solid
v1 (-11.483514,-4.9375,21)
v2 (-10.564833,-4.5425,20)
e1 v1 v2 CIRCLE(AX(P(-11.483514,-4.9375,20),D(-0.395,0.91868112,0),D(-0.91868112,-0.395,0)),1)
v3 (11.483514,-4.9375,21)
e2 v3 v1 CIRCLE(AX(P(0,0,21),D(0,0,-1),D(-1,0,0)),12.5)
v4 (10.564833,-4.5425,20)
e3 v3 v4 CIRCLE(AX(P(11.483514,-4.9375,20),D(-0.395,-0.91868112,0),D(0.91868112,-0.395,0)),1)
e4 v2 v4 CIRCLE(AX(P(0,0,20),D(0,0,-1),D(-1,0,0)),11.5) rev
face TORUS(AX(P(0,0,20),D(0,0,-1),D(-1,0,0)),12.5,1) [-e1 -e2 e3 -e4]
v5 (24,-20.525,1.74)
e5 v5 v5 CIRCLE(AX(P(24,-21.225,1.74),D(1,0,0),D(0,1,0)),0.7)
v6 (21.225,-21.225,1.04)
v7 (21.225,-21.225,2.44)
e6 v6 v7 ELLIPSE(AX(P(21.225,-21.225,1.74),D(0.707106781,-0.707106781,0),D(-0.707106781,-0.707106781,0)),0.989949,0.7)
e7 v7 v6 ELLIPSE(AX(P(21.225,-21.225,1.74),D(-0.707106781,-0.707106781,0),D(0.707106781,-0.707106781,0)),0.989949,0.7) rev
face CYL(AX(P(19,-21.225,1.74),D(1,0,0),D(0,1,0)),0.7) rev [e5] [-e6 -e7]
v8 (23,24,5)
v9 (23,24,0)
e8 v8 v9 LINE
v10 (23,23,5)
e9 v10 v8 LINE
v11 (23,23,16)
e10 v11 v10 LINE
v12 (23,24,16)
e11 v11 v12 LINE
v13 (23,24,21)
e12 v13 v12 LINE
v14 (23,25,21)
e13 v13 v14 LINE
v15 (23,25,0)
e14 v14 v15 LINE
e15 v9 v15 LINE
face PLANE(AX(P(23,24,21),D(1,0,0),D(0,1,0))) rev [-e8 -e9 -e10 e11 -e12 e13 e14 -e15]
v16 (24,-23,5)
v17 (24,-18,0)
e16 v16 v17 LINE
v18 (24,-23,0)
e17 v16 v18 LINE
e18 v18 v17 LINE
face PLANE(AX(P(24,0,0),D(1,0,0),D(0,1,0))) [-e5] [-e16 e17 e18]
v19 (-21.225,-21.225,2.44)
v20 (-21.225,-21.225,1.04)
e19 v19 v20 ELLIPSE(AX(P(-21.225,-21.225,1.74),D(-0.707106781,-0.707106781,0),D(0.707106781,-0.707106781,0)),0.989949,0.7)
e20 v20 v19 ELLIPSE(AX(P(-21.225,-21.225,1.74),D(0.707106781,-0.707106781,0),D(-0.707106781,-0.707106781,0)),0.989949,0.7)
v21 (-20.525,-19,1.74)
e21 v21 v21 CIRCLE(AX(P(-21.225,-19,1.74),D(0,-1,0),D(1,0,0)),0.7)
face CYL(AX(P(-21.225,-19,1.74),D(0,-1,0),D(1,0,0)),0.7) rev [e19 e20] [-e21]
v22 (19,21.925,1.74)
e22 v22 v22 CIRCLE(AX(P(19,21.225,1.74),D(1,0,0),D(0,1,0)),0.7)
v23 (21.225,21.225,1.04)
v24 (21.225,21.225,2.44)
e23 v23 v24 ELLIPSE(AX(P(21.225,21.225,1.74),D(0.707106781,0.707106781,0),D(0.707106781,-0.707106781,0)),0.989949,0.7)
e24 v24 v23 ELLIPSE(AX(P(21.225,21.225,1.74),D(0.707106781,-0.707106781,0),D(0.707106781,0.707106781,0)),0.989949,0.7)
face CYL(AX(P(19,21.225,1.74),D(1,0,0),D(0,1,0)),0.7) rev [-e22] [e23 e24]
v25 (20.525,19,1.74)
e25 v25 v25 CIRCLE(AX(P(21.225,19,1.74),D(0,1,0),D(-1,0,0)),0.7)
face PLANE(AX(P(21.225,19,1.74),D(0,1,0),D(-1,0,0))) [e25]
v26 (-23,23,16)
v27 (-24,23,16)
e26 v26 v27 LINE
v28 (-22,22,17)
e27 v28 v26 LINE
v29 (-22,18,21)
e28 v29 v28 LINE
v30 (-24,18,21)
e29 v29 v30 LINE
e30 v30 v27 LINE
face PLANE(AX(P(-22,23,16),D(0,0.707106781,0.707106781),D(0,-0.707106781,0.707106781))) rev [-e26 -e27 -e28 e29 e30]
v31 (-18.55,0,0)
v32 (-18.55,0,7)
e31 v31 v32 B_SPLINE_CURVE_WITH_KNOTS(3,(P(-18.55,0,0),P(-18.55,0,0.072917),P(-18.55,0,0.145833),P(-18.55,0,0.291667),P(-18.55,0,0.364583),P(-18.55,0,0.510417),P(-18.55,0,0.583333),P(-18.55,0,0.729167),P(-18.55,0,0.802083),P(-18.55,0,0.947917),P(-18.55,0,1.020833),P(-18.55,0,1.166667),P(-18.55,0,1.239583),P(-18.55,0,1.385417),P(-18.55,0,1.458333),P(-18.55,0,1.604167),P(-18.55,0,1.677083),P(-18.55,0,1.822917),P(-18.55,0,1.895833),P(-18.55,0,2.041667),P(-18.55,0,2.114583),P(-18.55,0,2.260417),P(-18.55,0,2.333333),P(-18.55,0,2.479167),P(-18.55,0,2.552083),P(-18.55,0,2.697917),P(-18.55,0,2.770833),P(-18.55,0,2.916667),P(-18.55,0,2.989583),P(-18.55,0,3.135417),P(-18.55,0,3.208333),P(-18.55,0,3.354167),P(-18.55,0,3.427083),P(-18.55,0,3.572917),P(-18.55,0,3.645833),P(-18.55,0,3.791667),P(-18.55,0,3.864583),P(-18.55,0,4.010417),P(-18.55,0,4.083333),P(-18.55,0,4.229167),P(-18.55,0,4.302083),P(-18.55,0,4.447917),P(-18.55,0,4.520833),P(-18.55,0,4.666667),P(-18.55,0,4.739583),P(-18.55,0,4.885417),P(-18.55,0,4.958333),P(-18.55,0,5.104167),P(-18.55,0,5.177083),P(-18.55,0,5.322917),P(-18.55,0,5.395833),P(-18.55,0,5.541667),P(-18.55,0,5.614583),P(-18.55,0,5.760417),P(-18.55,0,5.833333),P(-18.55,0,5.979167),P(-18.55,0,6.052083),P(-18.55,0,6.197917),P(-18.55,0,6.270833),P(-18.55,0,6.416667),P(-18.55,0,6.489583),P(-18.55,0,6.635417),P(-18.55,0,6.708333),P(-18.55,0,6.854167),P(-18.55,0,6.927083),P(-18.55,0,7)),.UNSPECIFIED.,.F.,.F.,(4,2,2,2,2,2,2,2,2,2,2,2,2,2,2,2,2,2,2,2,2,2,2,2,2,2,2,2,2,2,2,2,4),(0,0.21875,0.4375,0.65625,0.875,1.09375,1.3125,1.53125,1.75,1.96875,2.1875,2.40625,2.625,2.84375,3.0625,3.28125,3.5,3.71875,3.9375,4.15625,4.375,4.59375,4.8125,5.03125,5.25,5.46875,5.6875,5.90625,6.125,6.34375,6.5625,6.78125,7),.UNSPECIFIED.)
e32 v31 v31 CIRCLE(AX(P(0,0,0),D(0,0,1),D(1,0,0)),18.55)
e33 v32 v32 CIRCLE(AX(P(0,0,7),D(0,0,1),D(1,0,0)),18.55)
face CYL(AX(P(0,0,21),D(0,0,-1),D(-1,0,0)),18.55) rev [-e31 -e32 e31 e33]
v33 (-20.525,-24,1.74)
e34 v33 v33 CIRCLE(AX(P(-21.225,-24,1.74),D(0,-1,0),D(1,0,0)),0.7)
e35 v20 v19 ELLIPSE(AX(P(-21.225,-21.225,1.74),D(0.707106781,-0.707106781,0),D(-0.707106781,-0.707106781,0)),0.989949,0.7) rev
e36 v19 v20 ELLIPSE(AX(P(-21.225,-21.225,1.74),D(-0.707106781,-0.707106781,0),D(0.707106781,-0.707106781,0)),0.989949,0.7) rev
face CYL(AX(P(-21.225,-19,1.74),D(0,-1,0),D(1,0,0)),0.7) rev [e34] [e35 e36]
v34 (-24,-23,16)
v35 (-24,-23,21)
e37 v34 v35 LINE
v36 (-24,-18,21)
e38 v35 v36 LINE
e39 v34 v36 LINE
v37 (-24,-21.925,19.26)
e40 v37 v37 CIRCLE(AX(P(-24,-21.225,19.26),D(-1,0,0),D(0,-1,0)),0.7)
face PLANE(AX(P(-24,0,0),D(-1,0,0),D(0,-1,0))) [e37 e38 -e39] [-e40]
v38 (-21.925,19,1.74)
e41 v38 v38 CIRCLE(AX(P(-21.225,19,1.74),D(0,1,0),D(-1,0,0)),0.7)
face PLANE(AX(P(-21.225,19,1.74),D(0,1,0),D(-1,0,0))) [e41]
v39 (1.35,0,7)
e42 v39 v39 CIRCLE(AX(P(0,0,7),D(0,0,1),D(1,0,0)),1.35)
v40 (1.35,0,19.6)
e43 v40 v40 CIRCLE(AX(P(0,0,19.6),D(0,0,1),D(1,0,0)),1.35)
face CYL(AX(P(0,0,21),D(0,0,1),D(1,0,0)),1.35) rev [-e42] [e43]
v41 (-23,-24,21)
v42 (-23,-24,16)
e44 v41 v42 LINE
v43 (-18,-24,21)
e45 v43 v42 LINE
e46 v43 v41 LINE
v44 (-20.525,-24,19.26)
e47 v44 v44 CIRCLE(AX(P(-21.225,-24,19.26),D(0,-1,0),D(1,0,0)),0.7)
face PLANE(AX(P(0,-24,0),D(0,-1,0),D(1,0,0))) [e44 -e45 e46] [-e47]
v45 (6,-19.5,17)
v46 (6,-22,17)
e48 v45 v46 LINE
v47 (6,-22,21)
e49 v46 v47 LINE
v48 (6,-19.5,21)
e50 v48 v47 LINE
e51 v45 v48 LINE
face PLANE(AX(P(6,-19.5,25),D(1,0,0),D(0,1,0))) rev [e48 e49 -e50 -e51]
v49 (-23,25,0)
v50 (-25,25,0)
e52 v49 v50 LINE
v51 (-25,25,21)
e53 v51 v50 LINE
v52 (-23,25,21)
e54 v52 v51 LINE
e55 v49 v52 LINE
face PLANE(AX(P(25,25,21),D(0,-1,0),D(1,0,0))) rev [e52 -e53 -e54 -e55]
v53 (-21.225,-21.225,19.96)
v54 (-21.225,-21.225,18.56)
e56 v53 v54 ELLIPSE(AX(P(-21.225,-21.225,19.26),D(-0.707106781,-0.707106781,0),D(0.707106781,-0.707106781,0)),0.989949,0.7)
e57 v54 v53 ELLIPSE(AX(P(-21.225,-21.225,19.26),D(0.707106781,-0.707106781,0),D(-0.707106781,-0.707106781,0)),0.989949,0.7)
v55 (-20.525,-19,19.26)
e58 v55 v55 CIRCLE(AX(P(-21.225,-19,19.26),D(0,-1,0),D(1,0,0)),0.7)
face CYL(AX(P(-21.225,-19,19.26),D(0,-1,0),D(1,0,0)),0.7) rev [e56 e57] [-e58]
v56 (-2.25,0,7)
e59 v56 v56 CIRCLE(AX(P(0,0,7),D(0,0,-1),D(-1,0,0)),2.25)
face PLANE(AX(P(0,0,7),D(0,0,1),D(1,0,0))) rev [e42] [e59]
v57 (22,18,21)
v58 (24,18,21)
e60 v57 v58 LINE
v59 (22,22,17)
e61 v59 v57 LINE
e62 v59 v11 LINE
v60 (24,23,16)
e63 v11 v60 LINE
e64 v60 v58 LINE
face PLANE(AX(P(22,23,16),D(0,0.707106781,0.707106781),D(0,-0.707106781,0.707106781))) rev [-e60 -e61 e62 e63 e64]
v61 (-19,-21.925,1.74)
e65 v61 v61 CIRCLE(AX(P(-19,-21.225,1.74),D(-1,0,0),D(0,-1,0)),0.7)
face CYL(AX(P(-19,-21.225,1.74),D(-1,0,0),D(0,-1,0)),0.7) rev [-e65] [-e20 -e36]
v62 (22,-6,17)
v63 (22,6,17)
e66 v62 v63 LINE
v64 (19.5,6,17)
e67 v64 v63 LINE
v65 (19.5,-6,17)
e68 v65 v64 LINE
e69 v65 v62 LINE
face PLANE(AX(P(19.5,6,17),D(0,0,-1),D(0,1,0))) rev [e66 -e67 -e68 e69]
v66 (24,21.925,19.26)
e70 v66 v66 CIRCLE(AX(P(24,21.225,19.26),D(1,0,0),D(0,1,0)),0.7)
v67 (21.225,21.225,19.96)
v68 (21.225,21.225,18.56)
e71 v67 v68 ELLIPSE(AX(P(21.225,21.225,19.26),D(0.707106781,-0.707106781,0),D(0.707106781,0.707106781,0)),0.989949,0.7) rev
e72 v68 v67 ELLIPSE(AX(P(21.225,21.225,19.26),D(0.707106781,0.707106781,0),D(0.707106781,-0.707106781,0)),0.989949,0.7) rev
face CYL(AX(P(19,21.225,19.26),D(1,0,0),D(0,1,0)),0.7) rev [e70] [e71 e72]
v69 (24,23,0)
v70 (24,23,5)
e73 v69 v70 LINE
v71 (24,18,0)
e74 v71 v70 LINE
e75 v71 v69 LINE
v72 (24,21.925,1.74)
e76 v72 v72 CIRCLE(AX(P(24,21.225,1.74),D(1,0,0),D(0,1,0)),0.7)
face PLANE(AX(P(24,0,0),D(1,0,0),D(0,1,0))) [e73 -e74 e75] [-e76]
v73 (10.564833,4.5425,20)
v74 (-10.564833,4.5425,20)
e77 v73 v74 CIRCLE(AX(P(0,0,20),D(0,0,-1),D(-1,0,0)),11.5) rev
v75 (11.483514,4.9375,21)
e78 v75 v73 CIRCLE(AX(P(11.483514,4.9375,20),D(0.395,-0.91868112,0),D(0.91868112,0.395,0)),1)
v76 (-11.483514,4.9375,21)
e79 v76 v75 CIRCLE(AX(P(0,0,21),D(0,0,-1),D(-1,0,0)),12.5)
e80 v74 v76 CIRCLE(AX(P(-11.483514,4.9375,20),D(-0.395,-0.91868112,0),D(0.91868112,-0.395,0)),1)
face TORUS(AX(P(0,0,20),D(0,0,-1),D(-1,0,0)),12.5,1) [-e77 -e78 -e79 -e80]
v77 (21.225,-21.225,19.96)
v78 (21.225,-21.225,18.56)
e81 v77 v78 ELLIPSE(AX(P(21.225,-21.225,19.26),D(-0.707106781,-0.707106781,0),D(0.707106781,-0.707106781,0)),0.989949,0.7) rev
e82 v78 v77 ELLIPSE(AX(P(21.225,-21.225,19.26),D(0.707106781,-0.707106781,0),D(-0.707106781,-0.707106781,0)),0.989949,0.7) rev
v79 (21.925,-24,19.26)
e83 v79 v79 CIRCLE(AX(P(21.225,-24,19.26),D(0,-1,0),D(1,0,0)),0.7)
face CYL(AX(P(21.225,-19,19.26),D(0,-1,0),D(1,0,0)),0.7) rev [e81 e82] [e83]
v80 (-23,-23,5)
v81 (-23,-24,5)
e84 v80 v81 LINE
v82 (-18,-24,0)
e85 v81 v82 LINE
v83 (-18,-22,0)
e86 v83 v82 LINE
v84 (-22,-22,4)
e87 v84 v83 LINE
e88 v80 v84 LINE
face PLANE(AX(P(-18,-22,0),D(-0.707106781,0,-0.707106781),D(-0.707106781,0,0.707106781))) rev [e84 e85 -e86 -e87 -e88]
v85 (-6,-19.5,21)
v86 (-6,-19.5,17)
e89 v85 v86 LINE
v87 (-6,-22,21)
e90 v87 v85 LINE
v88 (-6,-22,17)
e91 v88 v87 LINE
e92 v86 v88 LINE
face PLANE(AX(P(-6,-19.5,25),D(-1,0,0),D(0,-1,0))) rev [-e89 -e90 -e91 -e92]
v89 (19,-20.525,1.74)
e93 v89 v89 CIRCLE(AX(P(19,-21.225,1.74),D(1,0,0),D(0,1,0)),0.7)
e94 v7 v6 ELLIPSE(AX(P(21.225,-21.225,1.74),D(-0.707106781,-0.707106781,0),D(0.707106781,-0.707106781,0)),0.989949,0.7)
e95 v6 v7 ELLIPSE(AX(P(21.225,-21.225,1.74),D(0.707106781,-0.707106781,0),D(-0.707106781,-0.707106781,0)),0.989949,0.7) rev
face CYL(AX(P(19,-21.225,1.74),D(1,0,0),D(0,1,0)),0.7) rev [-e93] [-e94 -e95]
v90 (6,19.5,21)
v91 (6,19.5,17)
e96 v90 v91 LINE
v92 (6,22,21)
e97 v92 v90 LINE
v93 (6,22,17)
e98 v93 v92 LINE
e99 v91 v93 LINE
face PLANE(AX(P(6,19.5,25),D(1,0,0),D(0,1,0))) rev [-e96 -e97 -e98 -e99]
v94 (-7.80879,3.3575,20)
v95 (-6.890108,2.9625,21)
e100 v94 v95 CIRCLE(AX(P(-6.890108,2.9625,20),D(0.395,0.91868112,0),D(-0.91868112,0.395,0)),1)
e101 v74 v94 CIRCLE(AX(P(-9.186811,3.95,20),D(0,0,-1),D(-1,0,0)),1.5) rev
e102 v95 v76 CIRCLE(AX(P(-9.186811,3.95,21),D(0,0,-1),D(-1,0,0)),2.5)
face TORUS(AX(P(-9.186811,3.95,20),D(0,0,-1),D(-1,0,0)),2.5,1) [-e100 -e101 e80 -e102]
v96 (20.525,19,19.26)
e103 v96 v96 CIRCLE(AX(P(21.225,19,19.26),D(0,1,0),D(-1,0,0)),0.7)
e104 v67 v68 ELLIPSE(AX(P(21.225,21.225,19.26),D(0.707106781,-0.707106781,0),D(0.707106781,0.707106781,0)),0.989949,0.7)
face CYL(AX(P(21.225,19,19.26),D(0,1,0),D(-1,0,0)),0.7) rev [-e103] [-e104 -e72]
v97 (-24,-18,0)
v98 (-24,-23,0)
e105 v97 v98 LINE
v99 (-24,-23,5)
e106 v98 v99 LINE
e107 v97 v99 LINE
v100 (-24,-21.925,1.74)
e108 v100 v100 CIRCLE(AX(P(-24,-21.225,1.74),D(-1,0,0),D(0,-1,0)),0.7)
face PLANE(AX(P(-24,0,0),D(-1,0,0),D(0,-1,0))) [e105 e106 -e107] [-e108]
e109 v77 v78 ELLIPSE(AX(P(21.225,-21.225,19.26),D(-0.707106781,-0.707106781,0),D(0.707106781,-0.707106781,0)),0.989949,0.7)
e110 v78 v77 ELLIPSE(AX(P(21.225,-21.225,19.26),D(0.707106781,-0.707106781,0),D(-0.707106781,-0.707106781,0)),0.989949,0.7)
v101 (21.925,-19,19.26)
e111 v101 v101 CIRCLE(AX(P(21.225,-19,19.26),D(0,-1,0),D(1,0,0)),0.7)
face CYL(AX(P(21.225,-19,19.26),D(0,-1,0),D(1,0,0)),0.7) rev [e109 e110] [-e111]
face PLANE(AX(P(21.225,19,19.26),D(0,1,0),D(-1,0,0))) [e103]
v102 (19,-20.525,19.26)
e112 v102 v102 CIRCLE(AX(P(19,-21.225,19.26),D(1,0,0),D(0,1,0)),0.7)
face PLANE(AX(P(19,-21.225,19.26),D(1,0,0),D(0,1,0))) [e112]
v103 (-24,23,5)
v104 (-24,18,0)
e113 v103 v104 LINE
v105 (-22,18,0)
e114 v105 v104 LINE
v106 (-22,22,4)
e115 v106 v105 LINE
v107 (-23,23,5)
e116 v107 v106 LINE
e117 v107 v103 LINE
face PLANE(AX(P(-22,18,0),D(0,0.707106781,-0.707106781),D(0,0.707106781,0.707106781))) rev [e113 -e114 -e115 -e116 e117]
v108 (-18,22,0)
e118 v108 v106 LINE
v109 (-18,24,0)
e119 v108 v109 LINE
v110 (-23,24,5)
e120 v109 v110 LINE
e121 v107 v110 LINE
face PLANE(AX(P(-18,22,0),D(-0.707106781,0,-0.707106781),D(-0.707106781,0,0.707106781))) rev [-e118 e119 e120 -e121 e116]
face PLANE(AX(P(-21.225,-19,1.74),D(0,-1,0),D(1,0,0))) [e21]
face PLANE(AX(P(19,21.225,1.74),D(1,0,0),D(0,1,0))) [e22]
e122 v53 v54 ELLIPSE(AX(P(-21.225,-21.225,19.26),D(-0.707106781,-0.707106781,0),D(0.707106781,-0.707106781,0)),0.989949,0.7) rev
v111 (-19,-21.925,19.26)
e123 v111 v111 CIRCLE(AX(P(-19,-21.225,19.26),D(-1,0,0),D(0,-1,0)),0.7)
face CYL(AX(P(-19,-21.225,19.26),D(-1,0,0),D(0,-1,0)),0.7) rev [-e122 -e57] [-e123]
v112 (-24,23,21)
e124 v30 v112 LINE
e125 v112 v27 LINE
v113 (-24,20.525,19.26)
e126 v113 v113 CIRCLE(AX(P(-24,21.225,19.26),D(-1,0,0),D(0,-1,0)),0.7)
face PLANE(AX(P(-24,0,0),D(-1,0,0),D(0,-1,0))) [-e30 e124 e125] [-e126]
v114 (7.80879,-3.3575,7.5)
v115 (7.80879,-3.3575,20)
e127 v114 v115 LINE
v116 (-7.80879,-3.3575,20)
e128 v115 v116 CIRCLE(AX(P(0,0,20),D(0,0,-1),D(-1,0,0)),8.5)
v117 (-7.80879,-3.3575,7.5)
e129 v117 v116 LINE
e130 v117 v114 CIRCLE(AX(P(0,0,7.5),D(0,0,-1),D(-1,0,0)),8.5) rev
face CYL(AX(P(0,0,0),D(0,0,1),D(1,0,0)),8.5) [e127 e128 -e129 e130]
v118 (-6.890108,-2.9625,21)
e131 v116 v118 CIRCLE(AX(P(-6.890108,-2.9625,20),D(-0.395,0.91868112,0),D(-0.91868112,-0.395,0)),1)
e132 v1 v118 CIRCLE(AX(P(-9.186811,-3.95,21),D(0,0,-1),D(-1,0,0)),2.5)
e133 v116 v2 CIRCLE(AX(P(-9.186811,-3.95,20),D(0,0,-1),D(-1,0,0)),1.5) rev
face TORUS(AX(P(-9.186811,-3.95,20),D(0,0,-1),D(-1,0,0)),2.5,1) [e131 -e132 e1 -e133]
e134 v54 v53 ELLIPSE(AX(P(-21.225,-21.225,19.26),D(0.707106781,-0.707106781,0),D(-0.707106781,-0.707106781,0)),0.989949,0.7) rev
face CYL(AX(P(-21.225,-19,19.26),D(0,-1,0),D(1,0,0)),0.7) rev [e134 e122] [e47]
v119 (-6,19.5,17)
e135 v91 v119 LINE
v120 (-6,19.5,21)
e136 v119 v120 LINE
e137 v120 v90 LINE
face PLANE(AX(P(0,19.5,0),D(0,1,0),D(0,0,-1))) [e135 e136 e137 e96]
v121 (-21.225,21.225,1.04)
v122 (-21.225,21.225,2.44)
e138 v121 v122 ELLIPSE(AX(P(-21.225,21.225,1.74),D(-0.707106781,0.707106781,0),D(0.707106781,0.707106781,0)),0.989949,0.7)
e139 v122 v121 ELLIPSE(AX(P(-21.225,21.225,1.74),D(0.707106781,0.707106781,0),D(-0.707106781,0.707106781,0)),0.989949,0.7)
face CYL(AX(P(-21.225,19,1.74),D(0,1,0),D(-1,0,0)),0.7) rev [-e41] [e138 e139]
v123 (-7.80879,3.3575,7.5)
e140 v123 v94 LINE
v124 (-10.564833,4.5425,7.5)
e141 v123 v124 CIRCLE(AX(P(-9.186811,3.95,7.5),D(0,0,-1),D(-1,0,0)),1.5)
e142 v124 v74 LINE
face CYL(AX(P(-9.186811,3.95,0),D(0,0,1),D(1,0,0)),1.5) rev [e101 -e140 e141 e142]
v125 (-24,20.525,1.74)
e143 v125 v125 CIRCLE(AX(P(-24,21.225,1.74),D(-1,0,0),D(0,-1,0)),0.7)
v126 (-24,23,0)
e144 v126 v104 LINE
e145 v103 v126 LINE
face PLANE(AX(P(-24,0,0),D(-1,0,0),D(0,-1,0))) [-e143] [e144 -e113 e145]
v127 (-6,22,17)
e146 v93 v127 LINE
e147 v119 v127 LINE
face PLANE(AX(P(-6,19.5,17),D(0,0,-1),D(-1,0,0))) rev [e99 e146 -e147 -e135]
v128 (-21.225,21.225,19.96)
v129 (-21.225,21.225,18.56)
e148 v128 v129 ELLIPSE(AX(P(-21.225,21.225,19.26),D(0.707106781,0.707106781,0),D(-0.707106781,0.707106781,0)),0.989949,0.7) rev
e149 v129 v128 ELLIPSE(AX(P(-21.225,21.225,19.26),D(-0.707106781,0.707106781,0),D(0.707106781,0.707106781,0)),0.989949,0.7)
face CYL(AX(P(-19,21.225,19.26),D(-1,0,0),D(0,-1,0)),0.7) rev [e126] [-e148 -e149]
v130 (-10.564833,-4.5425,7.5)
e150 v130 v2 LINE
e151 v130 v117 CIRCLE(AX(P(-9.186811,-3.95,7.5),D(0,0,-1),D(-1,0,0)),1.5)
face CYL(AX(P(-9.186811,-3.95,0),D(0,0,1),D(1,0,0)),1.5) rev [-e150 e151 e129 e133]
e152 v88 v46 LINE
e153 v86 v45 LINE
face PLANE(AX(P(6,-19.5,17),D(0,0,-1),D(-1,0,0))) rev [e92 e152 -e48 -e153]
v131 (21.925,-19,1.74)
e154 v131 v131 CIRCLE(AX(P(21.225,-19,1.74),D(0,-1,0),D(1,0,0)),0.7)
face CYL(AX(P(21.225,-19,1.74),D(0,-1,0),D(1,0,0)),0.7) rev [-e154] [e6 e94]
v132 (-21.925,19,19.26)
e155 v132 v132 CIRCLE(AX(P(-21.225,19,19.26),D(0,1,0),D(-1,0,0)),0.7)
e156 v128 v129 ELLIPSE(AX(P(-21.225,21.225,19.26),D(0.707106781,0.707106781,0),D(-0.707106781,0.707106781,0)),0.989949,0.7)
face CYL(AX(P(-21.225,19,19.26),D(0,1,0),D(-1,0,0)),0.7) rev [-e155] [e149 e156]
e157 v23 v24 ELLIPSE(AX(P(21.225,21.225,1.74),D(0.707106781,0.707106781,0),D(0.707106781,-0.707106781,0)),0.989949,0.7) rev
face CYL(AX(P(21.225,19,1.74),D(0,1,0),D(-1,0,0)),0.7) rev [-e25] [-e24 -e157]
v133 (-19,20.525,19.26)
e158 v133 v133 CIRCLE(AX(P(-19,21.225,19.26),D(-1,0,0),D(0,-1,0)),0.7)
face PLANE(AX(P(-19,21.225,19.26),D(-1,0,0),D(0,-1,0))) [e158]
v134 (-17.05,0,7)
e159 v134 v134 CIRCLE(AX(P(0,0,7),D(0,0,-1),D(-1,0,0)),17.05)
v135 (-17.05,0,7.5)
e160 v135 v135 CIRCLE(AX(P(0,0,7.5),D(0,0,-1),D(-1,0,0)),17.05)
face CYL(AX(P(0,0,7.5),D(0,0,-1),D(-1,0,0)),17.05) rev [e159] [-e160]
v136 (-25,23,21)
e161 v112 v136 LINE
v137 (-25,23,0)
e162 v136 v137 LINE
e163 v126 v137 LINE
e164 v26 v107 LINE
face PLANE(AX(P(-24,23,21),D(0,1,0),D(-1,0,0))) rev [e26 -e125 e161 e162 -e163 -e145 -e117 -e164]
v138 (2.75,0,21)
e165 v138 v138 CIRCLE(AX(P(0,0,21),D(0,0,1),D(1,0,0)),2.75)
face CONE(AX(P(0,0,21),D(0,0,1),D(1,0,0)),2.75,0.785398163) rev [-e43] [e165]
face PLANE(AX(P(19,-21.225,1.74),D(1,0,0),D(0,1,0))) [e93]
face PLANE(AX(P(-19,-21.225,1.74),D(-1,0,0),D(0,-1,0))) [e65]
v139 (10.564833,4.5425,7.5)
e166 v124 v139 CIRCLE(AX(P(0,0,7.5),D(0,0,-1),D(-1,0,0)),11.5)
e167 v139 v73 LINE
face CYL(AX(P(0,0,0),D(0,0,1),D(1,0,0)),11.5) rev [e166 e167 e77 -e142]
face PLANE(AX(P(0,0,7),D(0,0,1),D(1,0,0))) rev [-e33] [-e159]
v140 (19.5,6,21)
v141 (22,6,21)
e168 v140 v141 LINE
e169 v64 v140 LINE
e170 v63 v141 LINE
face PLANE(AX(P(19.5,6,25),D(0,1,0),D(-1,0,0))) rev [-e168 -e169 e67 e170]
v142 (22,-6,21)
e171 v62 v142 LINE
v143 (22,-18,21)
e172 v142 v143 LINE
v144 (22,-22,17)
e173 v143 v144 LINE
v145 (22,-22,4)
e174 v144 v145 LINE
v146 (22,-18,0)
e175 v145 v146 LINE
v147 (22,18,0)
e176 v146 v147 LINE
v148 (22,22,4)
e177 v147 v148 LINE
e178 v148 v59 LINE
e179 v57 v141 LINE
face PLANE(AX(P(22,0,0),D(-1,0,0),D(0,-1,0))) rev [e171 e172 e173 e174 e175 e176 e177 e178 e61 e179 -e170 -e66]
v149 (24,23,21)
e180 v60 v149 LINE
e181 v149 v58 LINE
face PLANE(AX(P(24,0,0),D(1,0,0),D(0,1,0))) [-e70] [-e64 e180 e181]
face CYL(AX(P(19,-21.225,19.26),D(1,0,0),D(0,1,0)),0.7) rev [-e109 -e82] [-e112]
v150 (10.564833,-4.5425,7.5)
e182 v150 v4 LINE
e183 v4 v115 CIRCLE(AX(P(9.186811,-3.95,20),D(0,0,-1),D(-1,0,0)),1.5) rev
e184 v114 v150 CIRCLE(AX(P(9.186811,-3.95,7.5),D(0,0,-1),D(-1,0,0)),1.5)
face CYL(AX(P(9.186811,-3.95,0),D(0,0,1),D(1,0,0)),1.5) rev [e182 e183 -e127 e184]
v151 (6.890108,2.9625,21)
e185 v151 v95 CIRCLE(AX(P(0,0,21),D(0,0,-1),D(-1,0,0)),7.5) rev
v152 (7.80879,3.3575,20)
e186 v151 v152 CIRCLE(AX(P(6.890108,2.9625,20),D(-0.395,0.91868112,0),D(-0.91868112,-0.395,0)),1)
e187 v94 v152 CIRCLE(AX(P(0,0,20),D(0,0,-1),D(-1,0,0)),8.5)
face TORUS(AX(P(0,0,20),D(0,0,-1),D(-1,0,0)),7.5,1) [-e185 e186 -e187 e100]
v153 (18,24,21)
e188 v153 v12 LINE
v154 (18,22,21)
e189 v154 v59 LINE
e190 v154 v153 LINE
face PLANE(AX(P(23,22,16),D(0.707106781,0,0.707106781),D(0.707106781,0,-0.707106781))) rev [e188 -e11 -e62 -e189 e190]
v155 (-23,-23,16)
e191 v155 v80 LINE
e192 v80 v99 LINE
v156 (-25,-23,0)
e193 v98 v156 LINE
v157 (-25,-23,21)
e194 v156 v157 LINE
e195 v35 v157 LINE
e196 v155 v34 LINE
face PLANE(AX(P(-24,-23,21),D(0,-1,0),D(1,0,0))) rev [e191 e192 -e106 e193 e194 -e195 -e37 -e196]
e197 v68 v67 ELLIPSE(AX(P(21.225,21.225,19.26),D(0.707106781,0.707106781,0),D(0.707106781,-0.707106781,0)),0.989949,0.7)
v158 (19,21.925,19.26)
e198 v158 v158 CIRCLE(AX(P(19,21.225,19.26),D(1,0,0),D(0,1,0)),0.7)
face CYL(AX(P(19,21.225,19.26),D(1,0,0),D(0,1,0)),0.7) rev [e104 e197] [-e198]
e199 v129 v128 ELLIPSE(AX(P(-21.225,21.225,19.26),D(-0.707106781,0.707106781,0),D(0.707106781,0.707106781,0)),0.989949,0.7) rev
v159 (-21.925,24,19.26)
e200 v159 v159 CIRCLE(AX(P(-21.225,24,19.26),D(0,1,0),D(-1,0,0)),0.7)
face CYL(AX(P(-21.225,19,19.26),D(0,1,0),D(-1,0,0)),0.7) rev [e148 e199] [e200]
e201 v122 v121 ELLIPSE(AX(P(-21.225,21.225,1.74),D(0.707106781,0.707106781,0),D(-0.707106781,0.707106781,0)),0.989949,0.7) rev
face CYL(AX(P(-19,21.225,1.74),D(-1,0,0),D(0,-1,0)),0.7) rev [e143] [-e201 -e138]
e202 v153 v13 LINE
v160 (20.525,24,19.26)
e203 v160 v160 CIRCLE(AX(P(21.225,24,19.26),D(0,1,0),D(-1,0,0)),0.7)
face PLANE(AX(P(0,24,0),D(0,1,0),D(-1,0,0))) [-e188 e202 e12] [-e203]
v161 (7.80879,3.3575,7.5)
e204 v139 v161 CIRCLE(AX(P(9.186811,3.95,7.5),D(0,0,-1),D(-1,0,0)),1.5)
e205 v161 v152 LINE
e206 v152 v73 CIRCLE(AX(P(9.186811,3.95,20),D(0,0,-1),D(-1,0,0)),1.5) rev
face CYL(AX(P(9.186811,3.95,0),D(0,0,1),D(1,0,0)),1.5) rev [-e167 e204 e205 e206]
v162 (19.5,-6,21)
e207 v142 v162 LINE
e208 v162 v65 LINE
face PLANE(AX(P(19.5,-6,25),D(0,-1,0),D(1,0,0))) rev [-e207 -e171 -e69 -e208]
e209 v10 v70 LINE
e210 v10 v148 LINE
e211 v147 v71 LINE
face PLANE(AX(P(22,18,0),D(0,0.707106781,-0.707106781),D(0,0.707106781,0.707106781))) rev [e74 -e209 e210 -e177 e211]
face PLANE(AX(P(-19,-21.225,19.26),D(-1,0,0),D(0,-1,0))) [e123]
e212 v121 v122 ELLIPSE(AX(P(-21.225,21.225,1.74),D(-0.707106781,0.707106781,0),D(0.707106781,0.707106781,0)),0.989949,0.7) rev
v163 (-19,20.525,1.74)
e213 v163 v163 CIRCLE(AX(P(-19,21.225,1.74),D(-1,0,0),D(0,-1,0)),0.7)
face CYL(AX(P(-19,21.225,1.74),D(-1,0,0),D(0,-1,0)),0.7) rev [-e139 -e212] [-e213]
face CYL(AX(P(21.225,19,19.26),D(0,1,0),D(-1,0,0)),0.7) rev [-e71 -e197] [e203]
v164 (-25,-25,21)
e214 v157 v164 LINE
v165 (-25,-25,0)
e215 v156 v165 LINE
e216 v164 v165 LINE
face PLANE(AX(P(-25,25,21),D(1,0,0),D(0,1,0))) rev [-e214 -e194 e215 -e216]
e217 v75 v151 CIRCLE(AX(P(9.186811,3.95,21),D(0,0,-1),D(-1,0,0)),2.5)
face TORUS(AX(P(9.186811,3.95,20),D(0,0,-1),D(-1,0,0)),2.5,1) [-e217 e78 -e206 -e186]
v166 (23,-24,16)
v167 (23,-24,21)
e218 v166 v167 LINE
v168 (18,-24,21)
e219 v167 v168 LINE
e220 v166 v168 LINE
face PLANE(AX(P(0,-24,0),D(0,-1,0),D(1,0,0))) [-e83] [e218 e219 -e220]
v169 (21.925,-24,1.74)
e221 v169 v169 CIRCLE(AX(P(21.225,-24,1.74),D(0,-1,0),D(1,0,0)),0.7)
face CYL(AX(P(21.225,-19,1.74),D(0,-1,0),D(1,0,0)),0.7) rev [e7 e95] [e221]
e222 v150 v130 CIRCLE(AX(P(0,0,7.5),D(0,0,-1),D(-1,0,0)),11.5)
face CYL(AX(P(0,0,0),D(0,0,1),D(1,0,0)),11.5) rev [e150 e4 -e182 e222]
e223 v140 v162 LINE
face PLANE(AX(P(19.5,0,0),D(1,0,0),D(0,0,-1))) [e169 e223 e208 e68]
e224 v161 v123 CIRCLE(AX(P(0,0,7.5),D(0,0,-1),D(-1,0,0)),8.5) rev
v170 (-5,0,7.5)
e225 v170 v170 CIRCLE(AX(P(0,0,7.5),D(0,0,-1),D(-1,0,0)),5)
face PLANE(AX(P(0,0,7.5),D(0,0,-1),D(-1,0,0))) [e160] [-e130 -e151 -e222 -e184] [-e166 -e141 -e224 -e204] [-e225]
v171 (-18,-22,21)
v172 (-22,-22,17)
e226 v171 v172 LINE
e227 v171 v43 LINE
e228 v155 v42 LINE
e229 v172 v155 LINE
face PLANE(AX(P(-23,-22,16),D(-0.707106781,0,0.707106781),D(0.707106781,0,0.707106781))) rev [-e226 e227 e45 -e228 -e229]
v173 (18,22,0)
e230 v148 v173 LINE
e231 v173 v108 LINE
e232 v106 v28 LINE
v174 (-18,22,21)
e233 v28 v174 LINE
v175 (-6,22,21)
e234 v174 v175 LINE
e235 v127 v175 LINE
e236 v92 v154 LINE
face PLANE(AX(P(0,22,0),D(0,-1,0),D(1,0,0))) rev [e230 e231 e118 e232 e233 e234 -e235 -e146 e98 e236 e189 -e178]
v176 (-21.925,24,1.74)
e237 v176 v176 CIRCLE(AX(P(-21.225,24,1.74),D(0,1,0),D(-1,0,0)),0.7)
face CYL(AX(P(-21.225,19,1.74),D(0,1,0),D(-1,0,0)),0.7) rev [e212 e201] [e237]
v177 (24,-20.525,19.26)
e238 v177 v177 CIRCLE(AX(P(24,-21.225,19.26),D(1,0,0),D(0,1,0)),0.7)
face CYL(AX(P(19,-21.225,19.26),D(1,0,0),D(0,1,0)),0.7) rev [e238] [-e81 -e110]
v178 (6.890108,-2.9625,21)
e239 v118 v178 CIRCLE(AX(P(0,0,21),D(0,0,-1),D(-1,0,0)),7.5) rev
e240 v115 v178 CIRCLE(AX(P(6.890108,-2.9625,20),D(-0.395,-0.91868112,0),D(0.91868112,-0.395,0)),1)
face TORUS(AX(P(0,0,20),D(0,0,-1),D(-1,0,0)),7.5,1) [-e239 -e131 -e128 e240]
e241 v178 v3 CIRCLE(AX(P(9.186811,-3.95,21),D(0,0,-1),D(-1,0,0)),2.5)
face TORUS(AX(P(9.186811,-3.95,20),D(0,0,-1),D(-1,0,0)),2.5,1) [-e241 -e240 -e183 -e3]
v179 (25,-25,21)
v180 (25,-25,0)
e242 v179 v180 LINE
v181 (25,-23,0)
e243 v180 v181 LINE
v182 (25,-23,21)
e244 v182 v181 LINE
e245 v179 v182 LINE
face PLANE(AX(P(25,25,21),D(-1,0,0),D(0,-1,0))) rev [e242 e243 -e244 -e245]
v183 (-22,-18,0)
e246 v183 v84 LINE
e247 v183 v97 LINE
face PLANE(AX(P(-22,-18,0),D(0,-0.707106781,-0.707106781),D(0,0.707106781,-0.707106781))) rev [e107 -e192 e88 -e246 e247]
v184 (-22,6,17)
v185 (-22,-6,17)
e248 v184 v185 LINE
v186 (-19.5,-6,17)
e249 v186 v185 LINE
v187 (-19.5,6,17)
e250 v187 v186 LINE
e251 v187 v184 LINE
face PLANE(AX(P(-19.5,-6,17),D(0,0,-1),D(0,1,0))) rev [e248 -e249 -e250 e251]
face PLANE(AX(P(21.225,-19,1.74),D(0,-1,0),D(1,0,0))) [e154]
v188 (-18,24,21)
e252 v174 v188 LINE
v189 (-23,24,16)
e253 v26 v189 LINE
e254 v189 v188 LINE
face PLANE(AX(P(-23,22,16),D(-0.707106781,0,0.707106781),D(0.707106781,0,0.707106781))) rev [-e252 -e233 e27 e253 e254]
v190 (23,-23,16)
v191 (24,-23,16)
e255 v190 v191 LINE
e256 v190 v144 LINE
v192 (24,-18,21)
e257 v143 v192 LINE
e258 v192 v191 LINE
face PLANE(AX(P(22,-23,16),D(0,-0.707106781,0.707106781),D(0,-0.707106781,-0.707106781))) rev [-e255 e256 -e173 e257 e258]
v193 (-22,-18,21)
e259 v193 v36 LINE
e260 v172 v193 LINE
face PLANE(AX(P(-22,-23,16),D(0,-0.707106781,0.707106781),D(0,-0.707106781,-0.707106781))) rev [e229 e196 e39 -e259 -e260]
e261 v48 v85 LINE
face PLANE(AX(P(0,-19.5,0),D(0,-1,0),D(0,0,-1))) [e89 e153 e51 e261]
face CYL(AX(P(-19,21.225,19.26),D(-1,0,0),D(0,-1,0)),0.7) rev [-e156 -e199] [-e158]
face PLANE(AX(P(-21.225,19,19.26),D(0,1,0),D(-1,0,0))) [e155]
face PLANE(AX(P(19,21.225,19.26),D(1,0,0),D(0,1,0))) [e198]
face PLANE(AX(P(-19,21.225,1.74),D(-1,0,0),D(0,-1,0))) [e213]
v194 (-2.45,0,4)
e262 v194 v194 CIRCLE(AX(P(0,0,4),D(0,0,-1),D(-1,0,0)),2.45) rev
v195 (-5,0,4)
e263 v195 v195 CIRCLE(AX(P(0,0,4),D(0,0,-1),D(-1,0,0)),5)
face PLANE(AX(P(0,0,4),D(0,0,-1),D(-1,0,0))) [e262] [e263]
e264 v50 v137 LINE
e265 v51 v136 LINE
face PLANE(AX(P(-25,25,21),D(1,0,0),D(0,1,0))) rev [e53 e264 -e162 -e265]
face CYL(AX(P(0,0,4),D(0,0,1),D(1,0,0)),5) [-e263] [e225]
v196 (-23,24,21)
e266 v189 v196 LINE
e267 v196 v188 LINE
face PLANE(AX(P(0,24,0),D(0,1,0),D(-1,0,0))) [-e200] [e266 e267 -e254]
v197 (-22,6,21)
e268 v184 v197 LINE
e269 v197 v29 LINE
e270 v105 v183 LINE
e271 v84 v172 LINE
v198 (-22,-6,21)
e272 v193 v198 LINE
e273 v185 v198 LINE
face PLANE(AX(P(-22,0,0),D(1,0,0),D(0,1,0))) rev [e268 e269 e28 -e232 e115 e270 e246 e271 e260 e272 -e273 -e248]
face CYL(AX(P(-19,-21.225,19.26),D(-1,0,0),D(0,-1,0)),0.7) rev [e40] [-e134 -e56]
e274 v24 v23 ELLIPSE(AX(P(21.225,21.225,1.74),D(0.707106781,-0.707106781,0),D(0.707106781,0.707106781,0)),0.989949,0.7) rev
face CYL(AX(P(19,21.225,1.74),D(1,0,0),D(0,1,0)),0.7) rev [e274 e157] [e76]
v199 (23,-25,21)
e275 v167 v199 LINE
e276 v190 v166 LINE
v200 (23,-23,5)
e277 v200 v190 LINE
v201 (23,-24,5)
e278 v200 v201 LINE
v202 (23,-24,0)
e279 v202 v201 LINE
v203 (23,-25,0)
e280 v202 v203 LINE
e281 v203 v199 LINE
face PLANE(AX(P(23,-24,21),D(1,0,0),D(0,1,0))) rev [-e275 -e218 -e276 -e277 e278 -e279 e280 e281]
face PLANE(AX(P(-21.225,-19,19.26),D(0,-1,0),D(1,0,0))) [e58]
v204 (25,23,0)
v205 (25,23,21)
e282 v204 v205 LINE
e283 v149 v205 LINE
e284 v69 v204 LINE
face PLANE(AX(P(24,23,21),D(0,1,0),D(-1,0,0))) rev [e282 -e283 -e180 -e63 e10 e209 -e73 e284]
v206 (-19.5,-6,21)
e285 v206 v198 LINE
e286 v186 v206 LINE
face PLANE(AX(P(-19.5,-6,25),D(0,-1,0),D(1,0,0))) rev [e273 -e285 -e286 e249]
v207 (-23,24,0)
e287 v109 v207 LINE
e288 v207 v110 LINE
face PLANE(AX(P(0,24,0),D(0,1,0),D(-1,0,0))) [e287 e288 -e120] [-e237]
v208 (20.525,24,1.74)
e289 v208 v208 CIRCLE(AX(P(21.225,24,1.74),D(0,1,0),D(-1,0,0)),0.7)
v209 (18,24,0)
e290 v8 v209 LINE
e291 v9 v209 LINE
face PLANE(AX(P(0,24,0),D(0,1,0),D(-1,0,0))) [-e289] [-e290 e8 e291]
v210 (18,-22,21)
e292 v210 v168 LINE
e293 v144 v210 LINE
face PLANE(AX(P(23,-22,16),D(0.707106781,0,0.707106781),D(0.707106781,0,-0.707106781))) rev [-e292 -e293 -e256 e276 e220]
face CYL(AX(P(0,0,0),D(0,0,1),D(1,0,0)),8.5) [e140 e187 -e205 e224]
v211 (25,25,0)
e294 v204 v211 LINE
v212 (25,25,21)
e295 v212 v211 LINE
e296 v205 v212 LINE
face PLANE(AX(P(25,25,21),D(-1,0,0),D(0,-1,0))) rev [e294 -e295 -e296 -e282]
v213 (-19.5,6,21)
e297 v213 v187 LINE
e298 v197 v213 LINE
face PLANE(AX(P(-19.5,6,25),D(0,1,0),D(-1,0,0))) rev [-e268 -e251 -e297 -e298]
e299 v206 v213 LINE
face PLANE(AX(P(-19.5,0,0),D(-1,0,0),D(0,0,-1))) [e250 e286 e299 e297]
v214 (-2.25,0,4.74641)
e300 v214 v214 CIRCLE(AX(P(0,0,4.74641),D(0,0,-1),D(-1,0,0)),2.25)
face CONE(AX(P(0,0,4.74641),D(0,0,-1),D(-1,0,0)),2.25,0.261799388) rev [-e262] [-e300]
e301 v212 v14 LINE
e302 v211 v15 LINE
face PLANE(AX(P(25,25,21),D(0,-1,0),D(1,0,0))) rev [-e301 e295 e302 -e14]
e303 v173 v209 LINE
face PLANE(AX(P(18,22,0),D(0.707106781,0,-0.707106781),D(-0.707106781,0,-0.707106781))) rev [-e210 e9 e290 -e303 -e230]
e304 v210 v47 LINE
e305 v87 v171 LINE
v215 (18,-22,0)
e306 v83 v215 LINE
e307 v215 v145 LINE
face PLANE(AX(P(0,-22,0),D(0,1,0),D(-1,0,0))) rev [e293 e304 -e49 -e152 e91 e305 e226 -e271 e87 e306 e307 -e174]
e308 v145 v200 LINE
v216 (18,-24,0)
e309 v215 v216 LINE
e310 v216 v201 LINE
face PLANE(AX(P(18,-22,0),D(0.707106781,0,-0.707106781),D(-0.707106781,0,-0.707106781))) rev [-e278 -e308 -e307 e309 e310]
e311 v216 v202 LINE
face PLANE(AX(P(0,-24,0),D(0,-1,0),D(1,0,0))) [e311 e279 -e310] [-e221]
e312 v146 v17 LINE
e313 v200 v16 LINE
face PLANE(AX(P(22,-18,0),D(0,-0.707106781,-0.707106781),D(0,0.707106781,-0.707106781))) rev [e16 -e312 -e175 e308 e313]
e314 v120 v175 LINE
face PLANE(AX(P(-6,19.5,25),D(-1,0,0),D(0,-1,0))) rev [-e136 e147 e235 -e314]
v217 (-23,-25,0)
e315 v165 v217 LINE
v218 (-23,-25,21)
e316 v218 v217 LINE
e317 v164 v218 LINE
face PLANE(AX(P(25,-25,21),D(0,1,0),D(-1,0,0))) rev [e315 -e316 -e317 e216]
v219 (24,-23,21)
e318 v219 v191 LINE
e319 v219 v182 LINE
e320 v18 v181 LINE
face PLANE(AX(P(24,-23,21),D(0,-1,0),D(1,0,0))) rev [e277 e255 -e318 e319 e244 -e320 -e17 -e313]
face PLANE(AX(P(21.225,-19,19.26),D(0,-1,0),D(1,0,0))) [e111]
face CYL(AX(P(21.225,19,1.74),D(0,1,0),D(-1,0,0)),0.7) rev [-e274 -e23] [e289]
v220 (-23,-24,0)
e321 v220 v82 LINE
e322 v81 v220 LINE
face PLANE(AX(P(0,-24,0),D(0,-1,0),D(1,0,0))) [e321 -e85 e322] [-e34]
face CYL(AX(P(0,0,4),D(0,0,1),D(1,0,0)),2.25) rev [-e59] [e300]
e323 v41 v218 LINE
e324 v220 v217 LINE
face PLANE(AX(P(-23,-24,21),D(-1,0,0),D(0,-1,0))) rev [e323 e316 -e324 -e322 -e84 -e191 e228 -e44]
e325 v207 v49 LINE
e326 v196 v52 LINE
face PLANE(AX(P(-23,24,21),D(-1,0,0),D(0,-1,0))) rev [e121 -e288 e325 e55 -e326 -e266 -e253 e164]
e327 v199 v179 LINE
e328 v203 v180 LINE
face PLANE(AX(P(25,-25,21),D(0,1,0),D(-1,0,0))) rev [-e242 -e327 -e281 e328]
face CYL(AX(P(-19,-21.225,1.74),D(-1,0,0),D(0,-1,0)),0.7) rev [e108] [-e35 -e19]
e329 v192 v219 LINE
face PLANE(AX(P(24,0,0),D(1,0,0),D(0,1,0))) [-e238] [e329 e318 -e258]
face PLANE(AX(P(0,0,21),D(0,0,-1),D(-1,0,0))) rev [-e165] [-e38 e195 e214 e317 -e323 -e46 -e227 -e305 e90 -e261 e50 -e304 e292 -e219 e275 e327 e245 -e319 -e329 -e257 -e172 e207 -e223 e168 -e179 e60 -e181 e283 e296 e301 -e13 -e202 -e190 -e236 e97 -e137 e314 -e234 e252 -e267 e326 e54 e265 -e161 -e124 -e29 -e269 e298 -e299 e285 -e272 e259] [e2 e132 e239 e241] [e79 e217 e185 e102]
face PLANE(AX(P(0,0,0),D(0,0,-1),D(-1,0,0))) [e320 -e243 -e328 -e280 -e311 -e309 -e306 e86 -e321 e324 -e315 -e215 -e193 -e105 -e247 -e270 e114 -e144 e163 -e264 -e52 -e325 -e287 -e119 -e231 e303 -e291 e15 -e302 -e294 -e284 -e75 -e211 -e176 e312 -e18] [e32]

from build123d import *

# Parameters (mm, degrees)
SKIZZE1_W                                           = 50
SKIZZE1_H                                           = 50
SKIZZE1_R                                           = 18.55
AUFSATZ_LINEAR_AUSTRAGEN1_DEPTH                     = 21
SKIZZE2_W                                           = 50
SKIZZE2_H                                           = 50
AUFSATZ_LINEAR_AUSTRAGEN2_DEPTH                     = 3
FORMSENKUNG_F_R_M2_5_LINSENSENKSCHRAUBE_D           = 2.7
FORMSENKUNG_F_R_M2_5_LINSENSENKSCHRAUBE_CSINK_D     = 5.5
FORMSENKUNG_F_R_M2_5_LINSENSENKSCHRAUBE_CSINK_ANGLE = 90
SKIZZE5_W                                           = 21
SKIZZE5_H                                           = 46
SCHNITT_LINEAR_AUSTRAGEN1_DEPTH                     = 1
SCHNITT_LINEAR_AUSTRAGEN2_DEPTH                     = 2
SKIZZE7_W                                           = 8
SKIZZE7_H                                           = 12
SCHNITT_LINEAR_AUSTRAGEN3_DEPTH                     = 2.5
KREISMUSTER1_COUNT                                  = 4
SKIZZE8_R                                           = 5
SKIZZE8_R_2                                         = 2.25
AUFSATZ_LINEAR_AUSTRAGEN3_DEPTH                     = 3
FASE1_SIZE                                          = 0.2
FASE1_SIZE2                                         = 0.746410162
SKIZZE10_R                                          = 0.7
SCHNITT_LINEAR_AUSTRAGEN4_DEPTH                     = 5
KREISMUSTER2_COUNT                                  = 4
SCHNITT_LINEAR_START                                = -0.5
SKIZZE12_R                                          = 17.05
SKIZZE12_R_2                                        = 5
SCHNITT_LINEAR_AUSTRAGEN7_DEPTH                     = 0.5
SCHNITT_LINEAR_AUSTRAGEN8_DEPTH                     = 42.12177039
VERRUNDUNG1_R                                       = 1


# Read off the part's stored shape, not the designer's step: Fläche verschieben1
with BuildPart() as part:
    # Skizze1 → Aufsatz-Linear austragen1 (new body)
    with BuildSketch(Plane.XY):
        Rectangle(SKIZZE1_W, SKIZZE1_H)
        with Locations(Location((0, 0, 0), (0, 0, 180))):
            Circle(SKIZZE1_R, mode=Mode.SUBTRACT)
    extrude(amount=AUFSATZ_LINEAR_AUSTRAGEN1_DEPTH)

    # Skizze2 → Aufsatz-Linear austragen2 (add)
    with BuildSketch(Plane.XY.offset(21)):
        Rectangle(SKIZZE2_W, SKIZZE2_H)
    extrude(amount=-AUFSATZ_LINEAR_AUSTRAGEN2_DEPTH)

    # Formsenkung für M2.5 Linsensenkschraube mit Schlitz1 (through all)
    with Locations(Plane.XY.offset(21)):
        with Locations((0, 0)):
            CounterSinkHole(FORMSENKUNG_F_R_M2_5_LINSENSENKSCHRAUBE_D / 2, FORMSENKUNG_F_R_M2_5_LINSENSENKSCHRAUBE_CSINK_D / 2, counter_sink_angle=FORMSENKUNG_F_R_M2_5_LINSENSENKSCHRAUBE_CSINK_ANGLE)

    # Skizze5 → Schnitt-Linear austragen1 (cut)
    with BuildSketch(Plane(origin=(25, 0, 0), x_dir=(0, 0, -1), z_dir=(1, 0, 0))):
        with Locations((-10.5, 0)):
            Rectangle(SKIZZE5_W, SKIZZE5_H)
    schnitt_linear_austragen1 = extrude(amount=-SCHNITT_LINEAR_AUSTRAGEN1_DEPTH, mode=Mode.SUBTRACT)

    # Skizze6 → Schnitt-Linear austragen2 (cut)
    with BuildSketch(Plane(origin=(24, 0, 0), x_dir=(0, 0, -1), z_dir=(1, 0, 0))):
        Polygon((-16, 23), (-21, 18), (-21, -18), (-16, -23), (-5, -23), (0, -18), (0, 18), (-5, 23), align=None)
    schnitt_linear_austragen2 = extrude(amount=-SCHNITT_LINEAR_AUSTRAGEN2_DEPTH, mode=Mode.SUBTRACT)

    # Skizze7 → Schnitt-Linear austragen3 (cut)
    with BuildSketch(Plane(origin=(22, 0, 0), x_dir=(0, 0, -1), z_dir=(1, 0, 0))):
        with Locations((-21, 0)):
            Rectangle(SKIZZE7_W, SKIZZE7_H)
    schnitt_linear_austragen3 = extrude(amount=-SCHNITT_LINEAR_AUSTRAGEN3_DEPTH, mode=Mode.SUBTRACT)

    # Kreismuster1: Schnitt-Linear austragen1, Schnitt-Linear austragen2, Schnitt-Linear austragen3 ×4 about axis
    kreismuster1_axis = Axis((0, 0, 0), (0, 0, 1))
    add([schnitt_linear_austragen1.rotate(kreismuster1_axis, i * 360 / KREISMUSTER1_COUNT) for i in range(1, KREISMUSTER1_COUNT)], mode=Mode.SUBTRACT)
    add([schnitt_linear_austragen2.rotate(kreismuster1_axis, i * 360 / KREISMUSTER1_COUNT) for i in range(1, KREISMUSTER1_COUNT)], mode=Mode.SUBTRACT)
    add([schnitt_linear_austragen3.rotate(kreismuster1_axis, i * 360 / KREISMUSTER1_COUNT) for i in range(1, KREISMUSTER1_COUNT)], mode=Mode.SUBTRACT)

    # Skizze8 → Aufsatz-Linear austragen3 (add)
    with BuildSketch(Plane(origin=(0, 0, 18), x_dir=(-1, 0, 0), z_dir=(0, 0, -1))):
        with Locations(Location((0, 0, 0), (0, 0, 180))):
            Circle(SKIZZE8_R)
        Circle(SKIZZE8_R_2, mode=Mode.SUBTRACT)
    extrude(amount=AUFSATZ_LINEAR_AUSTRAGEN3_DEPTH)

    # Fase1
    fase1_edges = [part.edges().sort_by_distance(p)[0] for p in [
        (2.25, 0, 15),
    ]]
    fase1_side = [part.faces().sort_by_distance(p)[0] for p in [
        (-4.858578644, 0, 15),
    ]]
    chamfer(fase1_edges, length=FASE1_SIZE, length2=FASE1_SIZE2, reference=fase1_side[0])

    # Skizze10 → Schnitt-Linear austragen4 (cut)
    with BuildSketch(Plane(origin=(0, -24, 0), x_dir=(-1, 0, 0), z_dir=(0, -1, 0))):
        with Locations(Location((-21.225, -1.74, 0), (0, 0, 180))):
            Circle(SKIZZE10_R)
        with Locations(Location((21.225, -1.74, 0), (0, 0, 180))):
            Circle(SKIZZE10_R)
        with Locations(Location((21.225, -19.26, 0), (0, 0, 180))):
            Circle(SKIZZE10_R)
        with Locations(Location((-21.225, -19.26, 0), (0, 0, 180))):
            Circle(SKIZZE10_R)
    schnitt_linear_austragen4 = extrude(amount=-SCHNITT_LINEAR_AUSTRAGEN4_DEPTH, mode=Mode.SUBTRACT)

    # Kreismuster2: Schnitt-Linear austragen4 ×4 about axis
    kreismuster2_axis = Axis((0, 0, 0), (0, 0, 1))
    for i in range(1, KREISMUSTER2_COUNT):
        add(schnitt_linear_austragen4.rotate(kreismuster2_axis, i * 360 / KREISMUSTER2_COUNT), mode=Mode.SUBTRACT)

    # Skizze12 → Schnitt-Linear austragen7 (cut)
    with BuildSketch(Plane(origin=(0, 0, 18), x_dir=(-1, 0, 0), z_dir=(0, 0, -1)).offset(SCHNITT_LINEAR_START)):
        Circle(SKIZZE12_R)
        Circle(SKIZZE12_R_2, mode=Mode.SUBTRACT)
    extrude(amount=SCHNITT_LINEAR_AUSTRAGEN7_DEPTH, mode=Mode.SUBTRACT)

    # Fläche verschieben1 outline → Fläche verschieben1 (revolve)
    with BuildSketch(Plane.XZ):
        Polygon((1.35, 18), (1.35, 7), (2.25, 7), (2.25, 4.746410162), (2.45, 4), (5, 4), (5, 7.5), (17.05, 7.5), (17.05, 7), (18.55, 7), (18.55, 18), (17.05, 18), (17.05, 18.5), (5, 18.5), (5, 15), (2.45, 15), (2.25, 15.746410162), (2.25, 18), align=None)
    revolve(axis=Axis((0, 0, 0), (0, 0, 1)))

    # Skizze13 → Schnitt-Linear austragen8 (cut, through all)
    with BuildSketch(Plane.XY.offset(21)):
        with BuildLine():
            ThreePointArc((10.564832878, 4.5425), (0, 11.5), (-10.564832878, 4.5425))
            ThreePointArc((-10.564832878, 4.5425), (-9.779311199, 2.57197832), (-7.808789519, 3.3575))
            ThreePointArc((-7.808789519, 3.3575), (0, 8.5), (7.808789519, 3.3575))
            ThreePointArc((7.808789519, 3.3575), (9.779311199, 2.57197832), (10.564832878, 4.5425))
        make_face()
        with BuildLine():
            ThreePointArc((10.564832878, -4.5425), (0, -11.5), (-10.564832878, -4.5425))
            ThreePointArc((-10.564832878, -4.5425), (-9.779311199, -2.57197832), (-7.808789519, -3.3575))
            ThreePointArc((-7.808789519, -3.3575), (0, -8.5), (7.808789519, -3.3575))
            ThreePointArc((7.808789519, -3.3575), (9.779311199, -2.57197832), (10.564832878, -4.5425))
        make_face()
    extrude(amount=-SCHNITT_LINEAR_AUSTRAGEN8_DEPTH, mode=Mode.SUBTRACT)

    # Verrundung1
    verrundung1_edges = [part.edges().sort_by_distance(p)[0] for p in [
        (9.779311199, 2.57197832, 21),
        (0, 11.5, 21),
        (-9.779311199, 2.57197832, 21),
        (0, 8.5, 21),
        (9.779311199, -2.57197832, 21),
        (0, -8.5, 21),
        (-9.779311199, -2.57197832, 21),
        (0, -11.5, 21),
    ]]
    fillet(verrundung1_edges, radius=VERRUNDUNG1_R)


solid = part.part
